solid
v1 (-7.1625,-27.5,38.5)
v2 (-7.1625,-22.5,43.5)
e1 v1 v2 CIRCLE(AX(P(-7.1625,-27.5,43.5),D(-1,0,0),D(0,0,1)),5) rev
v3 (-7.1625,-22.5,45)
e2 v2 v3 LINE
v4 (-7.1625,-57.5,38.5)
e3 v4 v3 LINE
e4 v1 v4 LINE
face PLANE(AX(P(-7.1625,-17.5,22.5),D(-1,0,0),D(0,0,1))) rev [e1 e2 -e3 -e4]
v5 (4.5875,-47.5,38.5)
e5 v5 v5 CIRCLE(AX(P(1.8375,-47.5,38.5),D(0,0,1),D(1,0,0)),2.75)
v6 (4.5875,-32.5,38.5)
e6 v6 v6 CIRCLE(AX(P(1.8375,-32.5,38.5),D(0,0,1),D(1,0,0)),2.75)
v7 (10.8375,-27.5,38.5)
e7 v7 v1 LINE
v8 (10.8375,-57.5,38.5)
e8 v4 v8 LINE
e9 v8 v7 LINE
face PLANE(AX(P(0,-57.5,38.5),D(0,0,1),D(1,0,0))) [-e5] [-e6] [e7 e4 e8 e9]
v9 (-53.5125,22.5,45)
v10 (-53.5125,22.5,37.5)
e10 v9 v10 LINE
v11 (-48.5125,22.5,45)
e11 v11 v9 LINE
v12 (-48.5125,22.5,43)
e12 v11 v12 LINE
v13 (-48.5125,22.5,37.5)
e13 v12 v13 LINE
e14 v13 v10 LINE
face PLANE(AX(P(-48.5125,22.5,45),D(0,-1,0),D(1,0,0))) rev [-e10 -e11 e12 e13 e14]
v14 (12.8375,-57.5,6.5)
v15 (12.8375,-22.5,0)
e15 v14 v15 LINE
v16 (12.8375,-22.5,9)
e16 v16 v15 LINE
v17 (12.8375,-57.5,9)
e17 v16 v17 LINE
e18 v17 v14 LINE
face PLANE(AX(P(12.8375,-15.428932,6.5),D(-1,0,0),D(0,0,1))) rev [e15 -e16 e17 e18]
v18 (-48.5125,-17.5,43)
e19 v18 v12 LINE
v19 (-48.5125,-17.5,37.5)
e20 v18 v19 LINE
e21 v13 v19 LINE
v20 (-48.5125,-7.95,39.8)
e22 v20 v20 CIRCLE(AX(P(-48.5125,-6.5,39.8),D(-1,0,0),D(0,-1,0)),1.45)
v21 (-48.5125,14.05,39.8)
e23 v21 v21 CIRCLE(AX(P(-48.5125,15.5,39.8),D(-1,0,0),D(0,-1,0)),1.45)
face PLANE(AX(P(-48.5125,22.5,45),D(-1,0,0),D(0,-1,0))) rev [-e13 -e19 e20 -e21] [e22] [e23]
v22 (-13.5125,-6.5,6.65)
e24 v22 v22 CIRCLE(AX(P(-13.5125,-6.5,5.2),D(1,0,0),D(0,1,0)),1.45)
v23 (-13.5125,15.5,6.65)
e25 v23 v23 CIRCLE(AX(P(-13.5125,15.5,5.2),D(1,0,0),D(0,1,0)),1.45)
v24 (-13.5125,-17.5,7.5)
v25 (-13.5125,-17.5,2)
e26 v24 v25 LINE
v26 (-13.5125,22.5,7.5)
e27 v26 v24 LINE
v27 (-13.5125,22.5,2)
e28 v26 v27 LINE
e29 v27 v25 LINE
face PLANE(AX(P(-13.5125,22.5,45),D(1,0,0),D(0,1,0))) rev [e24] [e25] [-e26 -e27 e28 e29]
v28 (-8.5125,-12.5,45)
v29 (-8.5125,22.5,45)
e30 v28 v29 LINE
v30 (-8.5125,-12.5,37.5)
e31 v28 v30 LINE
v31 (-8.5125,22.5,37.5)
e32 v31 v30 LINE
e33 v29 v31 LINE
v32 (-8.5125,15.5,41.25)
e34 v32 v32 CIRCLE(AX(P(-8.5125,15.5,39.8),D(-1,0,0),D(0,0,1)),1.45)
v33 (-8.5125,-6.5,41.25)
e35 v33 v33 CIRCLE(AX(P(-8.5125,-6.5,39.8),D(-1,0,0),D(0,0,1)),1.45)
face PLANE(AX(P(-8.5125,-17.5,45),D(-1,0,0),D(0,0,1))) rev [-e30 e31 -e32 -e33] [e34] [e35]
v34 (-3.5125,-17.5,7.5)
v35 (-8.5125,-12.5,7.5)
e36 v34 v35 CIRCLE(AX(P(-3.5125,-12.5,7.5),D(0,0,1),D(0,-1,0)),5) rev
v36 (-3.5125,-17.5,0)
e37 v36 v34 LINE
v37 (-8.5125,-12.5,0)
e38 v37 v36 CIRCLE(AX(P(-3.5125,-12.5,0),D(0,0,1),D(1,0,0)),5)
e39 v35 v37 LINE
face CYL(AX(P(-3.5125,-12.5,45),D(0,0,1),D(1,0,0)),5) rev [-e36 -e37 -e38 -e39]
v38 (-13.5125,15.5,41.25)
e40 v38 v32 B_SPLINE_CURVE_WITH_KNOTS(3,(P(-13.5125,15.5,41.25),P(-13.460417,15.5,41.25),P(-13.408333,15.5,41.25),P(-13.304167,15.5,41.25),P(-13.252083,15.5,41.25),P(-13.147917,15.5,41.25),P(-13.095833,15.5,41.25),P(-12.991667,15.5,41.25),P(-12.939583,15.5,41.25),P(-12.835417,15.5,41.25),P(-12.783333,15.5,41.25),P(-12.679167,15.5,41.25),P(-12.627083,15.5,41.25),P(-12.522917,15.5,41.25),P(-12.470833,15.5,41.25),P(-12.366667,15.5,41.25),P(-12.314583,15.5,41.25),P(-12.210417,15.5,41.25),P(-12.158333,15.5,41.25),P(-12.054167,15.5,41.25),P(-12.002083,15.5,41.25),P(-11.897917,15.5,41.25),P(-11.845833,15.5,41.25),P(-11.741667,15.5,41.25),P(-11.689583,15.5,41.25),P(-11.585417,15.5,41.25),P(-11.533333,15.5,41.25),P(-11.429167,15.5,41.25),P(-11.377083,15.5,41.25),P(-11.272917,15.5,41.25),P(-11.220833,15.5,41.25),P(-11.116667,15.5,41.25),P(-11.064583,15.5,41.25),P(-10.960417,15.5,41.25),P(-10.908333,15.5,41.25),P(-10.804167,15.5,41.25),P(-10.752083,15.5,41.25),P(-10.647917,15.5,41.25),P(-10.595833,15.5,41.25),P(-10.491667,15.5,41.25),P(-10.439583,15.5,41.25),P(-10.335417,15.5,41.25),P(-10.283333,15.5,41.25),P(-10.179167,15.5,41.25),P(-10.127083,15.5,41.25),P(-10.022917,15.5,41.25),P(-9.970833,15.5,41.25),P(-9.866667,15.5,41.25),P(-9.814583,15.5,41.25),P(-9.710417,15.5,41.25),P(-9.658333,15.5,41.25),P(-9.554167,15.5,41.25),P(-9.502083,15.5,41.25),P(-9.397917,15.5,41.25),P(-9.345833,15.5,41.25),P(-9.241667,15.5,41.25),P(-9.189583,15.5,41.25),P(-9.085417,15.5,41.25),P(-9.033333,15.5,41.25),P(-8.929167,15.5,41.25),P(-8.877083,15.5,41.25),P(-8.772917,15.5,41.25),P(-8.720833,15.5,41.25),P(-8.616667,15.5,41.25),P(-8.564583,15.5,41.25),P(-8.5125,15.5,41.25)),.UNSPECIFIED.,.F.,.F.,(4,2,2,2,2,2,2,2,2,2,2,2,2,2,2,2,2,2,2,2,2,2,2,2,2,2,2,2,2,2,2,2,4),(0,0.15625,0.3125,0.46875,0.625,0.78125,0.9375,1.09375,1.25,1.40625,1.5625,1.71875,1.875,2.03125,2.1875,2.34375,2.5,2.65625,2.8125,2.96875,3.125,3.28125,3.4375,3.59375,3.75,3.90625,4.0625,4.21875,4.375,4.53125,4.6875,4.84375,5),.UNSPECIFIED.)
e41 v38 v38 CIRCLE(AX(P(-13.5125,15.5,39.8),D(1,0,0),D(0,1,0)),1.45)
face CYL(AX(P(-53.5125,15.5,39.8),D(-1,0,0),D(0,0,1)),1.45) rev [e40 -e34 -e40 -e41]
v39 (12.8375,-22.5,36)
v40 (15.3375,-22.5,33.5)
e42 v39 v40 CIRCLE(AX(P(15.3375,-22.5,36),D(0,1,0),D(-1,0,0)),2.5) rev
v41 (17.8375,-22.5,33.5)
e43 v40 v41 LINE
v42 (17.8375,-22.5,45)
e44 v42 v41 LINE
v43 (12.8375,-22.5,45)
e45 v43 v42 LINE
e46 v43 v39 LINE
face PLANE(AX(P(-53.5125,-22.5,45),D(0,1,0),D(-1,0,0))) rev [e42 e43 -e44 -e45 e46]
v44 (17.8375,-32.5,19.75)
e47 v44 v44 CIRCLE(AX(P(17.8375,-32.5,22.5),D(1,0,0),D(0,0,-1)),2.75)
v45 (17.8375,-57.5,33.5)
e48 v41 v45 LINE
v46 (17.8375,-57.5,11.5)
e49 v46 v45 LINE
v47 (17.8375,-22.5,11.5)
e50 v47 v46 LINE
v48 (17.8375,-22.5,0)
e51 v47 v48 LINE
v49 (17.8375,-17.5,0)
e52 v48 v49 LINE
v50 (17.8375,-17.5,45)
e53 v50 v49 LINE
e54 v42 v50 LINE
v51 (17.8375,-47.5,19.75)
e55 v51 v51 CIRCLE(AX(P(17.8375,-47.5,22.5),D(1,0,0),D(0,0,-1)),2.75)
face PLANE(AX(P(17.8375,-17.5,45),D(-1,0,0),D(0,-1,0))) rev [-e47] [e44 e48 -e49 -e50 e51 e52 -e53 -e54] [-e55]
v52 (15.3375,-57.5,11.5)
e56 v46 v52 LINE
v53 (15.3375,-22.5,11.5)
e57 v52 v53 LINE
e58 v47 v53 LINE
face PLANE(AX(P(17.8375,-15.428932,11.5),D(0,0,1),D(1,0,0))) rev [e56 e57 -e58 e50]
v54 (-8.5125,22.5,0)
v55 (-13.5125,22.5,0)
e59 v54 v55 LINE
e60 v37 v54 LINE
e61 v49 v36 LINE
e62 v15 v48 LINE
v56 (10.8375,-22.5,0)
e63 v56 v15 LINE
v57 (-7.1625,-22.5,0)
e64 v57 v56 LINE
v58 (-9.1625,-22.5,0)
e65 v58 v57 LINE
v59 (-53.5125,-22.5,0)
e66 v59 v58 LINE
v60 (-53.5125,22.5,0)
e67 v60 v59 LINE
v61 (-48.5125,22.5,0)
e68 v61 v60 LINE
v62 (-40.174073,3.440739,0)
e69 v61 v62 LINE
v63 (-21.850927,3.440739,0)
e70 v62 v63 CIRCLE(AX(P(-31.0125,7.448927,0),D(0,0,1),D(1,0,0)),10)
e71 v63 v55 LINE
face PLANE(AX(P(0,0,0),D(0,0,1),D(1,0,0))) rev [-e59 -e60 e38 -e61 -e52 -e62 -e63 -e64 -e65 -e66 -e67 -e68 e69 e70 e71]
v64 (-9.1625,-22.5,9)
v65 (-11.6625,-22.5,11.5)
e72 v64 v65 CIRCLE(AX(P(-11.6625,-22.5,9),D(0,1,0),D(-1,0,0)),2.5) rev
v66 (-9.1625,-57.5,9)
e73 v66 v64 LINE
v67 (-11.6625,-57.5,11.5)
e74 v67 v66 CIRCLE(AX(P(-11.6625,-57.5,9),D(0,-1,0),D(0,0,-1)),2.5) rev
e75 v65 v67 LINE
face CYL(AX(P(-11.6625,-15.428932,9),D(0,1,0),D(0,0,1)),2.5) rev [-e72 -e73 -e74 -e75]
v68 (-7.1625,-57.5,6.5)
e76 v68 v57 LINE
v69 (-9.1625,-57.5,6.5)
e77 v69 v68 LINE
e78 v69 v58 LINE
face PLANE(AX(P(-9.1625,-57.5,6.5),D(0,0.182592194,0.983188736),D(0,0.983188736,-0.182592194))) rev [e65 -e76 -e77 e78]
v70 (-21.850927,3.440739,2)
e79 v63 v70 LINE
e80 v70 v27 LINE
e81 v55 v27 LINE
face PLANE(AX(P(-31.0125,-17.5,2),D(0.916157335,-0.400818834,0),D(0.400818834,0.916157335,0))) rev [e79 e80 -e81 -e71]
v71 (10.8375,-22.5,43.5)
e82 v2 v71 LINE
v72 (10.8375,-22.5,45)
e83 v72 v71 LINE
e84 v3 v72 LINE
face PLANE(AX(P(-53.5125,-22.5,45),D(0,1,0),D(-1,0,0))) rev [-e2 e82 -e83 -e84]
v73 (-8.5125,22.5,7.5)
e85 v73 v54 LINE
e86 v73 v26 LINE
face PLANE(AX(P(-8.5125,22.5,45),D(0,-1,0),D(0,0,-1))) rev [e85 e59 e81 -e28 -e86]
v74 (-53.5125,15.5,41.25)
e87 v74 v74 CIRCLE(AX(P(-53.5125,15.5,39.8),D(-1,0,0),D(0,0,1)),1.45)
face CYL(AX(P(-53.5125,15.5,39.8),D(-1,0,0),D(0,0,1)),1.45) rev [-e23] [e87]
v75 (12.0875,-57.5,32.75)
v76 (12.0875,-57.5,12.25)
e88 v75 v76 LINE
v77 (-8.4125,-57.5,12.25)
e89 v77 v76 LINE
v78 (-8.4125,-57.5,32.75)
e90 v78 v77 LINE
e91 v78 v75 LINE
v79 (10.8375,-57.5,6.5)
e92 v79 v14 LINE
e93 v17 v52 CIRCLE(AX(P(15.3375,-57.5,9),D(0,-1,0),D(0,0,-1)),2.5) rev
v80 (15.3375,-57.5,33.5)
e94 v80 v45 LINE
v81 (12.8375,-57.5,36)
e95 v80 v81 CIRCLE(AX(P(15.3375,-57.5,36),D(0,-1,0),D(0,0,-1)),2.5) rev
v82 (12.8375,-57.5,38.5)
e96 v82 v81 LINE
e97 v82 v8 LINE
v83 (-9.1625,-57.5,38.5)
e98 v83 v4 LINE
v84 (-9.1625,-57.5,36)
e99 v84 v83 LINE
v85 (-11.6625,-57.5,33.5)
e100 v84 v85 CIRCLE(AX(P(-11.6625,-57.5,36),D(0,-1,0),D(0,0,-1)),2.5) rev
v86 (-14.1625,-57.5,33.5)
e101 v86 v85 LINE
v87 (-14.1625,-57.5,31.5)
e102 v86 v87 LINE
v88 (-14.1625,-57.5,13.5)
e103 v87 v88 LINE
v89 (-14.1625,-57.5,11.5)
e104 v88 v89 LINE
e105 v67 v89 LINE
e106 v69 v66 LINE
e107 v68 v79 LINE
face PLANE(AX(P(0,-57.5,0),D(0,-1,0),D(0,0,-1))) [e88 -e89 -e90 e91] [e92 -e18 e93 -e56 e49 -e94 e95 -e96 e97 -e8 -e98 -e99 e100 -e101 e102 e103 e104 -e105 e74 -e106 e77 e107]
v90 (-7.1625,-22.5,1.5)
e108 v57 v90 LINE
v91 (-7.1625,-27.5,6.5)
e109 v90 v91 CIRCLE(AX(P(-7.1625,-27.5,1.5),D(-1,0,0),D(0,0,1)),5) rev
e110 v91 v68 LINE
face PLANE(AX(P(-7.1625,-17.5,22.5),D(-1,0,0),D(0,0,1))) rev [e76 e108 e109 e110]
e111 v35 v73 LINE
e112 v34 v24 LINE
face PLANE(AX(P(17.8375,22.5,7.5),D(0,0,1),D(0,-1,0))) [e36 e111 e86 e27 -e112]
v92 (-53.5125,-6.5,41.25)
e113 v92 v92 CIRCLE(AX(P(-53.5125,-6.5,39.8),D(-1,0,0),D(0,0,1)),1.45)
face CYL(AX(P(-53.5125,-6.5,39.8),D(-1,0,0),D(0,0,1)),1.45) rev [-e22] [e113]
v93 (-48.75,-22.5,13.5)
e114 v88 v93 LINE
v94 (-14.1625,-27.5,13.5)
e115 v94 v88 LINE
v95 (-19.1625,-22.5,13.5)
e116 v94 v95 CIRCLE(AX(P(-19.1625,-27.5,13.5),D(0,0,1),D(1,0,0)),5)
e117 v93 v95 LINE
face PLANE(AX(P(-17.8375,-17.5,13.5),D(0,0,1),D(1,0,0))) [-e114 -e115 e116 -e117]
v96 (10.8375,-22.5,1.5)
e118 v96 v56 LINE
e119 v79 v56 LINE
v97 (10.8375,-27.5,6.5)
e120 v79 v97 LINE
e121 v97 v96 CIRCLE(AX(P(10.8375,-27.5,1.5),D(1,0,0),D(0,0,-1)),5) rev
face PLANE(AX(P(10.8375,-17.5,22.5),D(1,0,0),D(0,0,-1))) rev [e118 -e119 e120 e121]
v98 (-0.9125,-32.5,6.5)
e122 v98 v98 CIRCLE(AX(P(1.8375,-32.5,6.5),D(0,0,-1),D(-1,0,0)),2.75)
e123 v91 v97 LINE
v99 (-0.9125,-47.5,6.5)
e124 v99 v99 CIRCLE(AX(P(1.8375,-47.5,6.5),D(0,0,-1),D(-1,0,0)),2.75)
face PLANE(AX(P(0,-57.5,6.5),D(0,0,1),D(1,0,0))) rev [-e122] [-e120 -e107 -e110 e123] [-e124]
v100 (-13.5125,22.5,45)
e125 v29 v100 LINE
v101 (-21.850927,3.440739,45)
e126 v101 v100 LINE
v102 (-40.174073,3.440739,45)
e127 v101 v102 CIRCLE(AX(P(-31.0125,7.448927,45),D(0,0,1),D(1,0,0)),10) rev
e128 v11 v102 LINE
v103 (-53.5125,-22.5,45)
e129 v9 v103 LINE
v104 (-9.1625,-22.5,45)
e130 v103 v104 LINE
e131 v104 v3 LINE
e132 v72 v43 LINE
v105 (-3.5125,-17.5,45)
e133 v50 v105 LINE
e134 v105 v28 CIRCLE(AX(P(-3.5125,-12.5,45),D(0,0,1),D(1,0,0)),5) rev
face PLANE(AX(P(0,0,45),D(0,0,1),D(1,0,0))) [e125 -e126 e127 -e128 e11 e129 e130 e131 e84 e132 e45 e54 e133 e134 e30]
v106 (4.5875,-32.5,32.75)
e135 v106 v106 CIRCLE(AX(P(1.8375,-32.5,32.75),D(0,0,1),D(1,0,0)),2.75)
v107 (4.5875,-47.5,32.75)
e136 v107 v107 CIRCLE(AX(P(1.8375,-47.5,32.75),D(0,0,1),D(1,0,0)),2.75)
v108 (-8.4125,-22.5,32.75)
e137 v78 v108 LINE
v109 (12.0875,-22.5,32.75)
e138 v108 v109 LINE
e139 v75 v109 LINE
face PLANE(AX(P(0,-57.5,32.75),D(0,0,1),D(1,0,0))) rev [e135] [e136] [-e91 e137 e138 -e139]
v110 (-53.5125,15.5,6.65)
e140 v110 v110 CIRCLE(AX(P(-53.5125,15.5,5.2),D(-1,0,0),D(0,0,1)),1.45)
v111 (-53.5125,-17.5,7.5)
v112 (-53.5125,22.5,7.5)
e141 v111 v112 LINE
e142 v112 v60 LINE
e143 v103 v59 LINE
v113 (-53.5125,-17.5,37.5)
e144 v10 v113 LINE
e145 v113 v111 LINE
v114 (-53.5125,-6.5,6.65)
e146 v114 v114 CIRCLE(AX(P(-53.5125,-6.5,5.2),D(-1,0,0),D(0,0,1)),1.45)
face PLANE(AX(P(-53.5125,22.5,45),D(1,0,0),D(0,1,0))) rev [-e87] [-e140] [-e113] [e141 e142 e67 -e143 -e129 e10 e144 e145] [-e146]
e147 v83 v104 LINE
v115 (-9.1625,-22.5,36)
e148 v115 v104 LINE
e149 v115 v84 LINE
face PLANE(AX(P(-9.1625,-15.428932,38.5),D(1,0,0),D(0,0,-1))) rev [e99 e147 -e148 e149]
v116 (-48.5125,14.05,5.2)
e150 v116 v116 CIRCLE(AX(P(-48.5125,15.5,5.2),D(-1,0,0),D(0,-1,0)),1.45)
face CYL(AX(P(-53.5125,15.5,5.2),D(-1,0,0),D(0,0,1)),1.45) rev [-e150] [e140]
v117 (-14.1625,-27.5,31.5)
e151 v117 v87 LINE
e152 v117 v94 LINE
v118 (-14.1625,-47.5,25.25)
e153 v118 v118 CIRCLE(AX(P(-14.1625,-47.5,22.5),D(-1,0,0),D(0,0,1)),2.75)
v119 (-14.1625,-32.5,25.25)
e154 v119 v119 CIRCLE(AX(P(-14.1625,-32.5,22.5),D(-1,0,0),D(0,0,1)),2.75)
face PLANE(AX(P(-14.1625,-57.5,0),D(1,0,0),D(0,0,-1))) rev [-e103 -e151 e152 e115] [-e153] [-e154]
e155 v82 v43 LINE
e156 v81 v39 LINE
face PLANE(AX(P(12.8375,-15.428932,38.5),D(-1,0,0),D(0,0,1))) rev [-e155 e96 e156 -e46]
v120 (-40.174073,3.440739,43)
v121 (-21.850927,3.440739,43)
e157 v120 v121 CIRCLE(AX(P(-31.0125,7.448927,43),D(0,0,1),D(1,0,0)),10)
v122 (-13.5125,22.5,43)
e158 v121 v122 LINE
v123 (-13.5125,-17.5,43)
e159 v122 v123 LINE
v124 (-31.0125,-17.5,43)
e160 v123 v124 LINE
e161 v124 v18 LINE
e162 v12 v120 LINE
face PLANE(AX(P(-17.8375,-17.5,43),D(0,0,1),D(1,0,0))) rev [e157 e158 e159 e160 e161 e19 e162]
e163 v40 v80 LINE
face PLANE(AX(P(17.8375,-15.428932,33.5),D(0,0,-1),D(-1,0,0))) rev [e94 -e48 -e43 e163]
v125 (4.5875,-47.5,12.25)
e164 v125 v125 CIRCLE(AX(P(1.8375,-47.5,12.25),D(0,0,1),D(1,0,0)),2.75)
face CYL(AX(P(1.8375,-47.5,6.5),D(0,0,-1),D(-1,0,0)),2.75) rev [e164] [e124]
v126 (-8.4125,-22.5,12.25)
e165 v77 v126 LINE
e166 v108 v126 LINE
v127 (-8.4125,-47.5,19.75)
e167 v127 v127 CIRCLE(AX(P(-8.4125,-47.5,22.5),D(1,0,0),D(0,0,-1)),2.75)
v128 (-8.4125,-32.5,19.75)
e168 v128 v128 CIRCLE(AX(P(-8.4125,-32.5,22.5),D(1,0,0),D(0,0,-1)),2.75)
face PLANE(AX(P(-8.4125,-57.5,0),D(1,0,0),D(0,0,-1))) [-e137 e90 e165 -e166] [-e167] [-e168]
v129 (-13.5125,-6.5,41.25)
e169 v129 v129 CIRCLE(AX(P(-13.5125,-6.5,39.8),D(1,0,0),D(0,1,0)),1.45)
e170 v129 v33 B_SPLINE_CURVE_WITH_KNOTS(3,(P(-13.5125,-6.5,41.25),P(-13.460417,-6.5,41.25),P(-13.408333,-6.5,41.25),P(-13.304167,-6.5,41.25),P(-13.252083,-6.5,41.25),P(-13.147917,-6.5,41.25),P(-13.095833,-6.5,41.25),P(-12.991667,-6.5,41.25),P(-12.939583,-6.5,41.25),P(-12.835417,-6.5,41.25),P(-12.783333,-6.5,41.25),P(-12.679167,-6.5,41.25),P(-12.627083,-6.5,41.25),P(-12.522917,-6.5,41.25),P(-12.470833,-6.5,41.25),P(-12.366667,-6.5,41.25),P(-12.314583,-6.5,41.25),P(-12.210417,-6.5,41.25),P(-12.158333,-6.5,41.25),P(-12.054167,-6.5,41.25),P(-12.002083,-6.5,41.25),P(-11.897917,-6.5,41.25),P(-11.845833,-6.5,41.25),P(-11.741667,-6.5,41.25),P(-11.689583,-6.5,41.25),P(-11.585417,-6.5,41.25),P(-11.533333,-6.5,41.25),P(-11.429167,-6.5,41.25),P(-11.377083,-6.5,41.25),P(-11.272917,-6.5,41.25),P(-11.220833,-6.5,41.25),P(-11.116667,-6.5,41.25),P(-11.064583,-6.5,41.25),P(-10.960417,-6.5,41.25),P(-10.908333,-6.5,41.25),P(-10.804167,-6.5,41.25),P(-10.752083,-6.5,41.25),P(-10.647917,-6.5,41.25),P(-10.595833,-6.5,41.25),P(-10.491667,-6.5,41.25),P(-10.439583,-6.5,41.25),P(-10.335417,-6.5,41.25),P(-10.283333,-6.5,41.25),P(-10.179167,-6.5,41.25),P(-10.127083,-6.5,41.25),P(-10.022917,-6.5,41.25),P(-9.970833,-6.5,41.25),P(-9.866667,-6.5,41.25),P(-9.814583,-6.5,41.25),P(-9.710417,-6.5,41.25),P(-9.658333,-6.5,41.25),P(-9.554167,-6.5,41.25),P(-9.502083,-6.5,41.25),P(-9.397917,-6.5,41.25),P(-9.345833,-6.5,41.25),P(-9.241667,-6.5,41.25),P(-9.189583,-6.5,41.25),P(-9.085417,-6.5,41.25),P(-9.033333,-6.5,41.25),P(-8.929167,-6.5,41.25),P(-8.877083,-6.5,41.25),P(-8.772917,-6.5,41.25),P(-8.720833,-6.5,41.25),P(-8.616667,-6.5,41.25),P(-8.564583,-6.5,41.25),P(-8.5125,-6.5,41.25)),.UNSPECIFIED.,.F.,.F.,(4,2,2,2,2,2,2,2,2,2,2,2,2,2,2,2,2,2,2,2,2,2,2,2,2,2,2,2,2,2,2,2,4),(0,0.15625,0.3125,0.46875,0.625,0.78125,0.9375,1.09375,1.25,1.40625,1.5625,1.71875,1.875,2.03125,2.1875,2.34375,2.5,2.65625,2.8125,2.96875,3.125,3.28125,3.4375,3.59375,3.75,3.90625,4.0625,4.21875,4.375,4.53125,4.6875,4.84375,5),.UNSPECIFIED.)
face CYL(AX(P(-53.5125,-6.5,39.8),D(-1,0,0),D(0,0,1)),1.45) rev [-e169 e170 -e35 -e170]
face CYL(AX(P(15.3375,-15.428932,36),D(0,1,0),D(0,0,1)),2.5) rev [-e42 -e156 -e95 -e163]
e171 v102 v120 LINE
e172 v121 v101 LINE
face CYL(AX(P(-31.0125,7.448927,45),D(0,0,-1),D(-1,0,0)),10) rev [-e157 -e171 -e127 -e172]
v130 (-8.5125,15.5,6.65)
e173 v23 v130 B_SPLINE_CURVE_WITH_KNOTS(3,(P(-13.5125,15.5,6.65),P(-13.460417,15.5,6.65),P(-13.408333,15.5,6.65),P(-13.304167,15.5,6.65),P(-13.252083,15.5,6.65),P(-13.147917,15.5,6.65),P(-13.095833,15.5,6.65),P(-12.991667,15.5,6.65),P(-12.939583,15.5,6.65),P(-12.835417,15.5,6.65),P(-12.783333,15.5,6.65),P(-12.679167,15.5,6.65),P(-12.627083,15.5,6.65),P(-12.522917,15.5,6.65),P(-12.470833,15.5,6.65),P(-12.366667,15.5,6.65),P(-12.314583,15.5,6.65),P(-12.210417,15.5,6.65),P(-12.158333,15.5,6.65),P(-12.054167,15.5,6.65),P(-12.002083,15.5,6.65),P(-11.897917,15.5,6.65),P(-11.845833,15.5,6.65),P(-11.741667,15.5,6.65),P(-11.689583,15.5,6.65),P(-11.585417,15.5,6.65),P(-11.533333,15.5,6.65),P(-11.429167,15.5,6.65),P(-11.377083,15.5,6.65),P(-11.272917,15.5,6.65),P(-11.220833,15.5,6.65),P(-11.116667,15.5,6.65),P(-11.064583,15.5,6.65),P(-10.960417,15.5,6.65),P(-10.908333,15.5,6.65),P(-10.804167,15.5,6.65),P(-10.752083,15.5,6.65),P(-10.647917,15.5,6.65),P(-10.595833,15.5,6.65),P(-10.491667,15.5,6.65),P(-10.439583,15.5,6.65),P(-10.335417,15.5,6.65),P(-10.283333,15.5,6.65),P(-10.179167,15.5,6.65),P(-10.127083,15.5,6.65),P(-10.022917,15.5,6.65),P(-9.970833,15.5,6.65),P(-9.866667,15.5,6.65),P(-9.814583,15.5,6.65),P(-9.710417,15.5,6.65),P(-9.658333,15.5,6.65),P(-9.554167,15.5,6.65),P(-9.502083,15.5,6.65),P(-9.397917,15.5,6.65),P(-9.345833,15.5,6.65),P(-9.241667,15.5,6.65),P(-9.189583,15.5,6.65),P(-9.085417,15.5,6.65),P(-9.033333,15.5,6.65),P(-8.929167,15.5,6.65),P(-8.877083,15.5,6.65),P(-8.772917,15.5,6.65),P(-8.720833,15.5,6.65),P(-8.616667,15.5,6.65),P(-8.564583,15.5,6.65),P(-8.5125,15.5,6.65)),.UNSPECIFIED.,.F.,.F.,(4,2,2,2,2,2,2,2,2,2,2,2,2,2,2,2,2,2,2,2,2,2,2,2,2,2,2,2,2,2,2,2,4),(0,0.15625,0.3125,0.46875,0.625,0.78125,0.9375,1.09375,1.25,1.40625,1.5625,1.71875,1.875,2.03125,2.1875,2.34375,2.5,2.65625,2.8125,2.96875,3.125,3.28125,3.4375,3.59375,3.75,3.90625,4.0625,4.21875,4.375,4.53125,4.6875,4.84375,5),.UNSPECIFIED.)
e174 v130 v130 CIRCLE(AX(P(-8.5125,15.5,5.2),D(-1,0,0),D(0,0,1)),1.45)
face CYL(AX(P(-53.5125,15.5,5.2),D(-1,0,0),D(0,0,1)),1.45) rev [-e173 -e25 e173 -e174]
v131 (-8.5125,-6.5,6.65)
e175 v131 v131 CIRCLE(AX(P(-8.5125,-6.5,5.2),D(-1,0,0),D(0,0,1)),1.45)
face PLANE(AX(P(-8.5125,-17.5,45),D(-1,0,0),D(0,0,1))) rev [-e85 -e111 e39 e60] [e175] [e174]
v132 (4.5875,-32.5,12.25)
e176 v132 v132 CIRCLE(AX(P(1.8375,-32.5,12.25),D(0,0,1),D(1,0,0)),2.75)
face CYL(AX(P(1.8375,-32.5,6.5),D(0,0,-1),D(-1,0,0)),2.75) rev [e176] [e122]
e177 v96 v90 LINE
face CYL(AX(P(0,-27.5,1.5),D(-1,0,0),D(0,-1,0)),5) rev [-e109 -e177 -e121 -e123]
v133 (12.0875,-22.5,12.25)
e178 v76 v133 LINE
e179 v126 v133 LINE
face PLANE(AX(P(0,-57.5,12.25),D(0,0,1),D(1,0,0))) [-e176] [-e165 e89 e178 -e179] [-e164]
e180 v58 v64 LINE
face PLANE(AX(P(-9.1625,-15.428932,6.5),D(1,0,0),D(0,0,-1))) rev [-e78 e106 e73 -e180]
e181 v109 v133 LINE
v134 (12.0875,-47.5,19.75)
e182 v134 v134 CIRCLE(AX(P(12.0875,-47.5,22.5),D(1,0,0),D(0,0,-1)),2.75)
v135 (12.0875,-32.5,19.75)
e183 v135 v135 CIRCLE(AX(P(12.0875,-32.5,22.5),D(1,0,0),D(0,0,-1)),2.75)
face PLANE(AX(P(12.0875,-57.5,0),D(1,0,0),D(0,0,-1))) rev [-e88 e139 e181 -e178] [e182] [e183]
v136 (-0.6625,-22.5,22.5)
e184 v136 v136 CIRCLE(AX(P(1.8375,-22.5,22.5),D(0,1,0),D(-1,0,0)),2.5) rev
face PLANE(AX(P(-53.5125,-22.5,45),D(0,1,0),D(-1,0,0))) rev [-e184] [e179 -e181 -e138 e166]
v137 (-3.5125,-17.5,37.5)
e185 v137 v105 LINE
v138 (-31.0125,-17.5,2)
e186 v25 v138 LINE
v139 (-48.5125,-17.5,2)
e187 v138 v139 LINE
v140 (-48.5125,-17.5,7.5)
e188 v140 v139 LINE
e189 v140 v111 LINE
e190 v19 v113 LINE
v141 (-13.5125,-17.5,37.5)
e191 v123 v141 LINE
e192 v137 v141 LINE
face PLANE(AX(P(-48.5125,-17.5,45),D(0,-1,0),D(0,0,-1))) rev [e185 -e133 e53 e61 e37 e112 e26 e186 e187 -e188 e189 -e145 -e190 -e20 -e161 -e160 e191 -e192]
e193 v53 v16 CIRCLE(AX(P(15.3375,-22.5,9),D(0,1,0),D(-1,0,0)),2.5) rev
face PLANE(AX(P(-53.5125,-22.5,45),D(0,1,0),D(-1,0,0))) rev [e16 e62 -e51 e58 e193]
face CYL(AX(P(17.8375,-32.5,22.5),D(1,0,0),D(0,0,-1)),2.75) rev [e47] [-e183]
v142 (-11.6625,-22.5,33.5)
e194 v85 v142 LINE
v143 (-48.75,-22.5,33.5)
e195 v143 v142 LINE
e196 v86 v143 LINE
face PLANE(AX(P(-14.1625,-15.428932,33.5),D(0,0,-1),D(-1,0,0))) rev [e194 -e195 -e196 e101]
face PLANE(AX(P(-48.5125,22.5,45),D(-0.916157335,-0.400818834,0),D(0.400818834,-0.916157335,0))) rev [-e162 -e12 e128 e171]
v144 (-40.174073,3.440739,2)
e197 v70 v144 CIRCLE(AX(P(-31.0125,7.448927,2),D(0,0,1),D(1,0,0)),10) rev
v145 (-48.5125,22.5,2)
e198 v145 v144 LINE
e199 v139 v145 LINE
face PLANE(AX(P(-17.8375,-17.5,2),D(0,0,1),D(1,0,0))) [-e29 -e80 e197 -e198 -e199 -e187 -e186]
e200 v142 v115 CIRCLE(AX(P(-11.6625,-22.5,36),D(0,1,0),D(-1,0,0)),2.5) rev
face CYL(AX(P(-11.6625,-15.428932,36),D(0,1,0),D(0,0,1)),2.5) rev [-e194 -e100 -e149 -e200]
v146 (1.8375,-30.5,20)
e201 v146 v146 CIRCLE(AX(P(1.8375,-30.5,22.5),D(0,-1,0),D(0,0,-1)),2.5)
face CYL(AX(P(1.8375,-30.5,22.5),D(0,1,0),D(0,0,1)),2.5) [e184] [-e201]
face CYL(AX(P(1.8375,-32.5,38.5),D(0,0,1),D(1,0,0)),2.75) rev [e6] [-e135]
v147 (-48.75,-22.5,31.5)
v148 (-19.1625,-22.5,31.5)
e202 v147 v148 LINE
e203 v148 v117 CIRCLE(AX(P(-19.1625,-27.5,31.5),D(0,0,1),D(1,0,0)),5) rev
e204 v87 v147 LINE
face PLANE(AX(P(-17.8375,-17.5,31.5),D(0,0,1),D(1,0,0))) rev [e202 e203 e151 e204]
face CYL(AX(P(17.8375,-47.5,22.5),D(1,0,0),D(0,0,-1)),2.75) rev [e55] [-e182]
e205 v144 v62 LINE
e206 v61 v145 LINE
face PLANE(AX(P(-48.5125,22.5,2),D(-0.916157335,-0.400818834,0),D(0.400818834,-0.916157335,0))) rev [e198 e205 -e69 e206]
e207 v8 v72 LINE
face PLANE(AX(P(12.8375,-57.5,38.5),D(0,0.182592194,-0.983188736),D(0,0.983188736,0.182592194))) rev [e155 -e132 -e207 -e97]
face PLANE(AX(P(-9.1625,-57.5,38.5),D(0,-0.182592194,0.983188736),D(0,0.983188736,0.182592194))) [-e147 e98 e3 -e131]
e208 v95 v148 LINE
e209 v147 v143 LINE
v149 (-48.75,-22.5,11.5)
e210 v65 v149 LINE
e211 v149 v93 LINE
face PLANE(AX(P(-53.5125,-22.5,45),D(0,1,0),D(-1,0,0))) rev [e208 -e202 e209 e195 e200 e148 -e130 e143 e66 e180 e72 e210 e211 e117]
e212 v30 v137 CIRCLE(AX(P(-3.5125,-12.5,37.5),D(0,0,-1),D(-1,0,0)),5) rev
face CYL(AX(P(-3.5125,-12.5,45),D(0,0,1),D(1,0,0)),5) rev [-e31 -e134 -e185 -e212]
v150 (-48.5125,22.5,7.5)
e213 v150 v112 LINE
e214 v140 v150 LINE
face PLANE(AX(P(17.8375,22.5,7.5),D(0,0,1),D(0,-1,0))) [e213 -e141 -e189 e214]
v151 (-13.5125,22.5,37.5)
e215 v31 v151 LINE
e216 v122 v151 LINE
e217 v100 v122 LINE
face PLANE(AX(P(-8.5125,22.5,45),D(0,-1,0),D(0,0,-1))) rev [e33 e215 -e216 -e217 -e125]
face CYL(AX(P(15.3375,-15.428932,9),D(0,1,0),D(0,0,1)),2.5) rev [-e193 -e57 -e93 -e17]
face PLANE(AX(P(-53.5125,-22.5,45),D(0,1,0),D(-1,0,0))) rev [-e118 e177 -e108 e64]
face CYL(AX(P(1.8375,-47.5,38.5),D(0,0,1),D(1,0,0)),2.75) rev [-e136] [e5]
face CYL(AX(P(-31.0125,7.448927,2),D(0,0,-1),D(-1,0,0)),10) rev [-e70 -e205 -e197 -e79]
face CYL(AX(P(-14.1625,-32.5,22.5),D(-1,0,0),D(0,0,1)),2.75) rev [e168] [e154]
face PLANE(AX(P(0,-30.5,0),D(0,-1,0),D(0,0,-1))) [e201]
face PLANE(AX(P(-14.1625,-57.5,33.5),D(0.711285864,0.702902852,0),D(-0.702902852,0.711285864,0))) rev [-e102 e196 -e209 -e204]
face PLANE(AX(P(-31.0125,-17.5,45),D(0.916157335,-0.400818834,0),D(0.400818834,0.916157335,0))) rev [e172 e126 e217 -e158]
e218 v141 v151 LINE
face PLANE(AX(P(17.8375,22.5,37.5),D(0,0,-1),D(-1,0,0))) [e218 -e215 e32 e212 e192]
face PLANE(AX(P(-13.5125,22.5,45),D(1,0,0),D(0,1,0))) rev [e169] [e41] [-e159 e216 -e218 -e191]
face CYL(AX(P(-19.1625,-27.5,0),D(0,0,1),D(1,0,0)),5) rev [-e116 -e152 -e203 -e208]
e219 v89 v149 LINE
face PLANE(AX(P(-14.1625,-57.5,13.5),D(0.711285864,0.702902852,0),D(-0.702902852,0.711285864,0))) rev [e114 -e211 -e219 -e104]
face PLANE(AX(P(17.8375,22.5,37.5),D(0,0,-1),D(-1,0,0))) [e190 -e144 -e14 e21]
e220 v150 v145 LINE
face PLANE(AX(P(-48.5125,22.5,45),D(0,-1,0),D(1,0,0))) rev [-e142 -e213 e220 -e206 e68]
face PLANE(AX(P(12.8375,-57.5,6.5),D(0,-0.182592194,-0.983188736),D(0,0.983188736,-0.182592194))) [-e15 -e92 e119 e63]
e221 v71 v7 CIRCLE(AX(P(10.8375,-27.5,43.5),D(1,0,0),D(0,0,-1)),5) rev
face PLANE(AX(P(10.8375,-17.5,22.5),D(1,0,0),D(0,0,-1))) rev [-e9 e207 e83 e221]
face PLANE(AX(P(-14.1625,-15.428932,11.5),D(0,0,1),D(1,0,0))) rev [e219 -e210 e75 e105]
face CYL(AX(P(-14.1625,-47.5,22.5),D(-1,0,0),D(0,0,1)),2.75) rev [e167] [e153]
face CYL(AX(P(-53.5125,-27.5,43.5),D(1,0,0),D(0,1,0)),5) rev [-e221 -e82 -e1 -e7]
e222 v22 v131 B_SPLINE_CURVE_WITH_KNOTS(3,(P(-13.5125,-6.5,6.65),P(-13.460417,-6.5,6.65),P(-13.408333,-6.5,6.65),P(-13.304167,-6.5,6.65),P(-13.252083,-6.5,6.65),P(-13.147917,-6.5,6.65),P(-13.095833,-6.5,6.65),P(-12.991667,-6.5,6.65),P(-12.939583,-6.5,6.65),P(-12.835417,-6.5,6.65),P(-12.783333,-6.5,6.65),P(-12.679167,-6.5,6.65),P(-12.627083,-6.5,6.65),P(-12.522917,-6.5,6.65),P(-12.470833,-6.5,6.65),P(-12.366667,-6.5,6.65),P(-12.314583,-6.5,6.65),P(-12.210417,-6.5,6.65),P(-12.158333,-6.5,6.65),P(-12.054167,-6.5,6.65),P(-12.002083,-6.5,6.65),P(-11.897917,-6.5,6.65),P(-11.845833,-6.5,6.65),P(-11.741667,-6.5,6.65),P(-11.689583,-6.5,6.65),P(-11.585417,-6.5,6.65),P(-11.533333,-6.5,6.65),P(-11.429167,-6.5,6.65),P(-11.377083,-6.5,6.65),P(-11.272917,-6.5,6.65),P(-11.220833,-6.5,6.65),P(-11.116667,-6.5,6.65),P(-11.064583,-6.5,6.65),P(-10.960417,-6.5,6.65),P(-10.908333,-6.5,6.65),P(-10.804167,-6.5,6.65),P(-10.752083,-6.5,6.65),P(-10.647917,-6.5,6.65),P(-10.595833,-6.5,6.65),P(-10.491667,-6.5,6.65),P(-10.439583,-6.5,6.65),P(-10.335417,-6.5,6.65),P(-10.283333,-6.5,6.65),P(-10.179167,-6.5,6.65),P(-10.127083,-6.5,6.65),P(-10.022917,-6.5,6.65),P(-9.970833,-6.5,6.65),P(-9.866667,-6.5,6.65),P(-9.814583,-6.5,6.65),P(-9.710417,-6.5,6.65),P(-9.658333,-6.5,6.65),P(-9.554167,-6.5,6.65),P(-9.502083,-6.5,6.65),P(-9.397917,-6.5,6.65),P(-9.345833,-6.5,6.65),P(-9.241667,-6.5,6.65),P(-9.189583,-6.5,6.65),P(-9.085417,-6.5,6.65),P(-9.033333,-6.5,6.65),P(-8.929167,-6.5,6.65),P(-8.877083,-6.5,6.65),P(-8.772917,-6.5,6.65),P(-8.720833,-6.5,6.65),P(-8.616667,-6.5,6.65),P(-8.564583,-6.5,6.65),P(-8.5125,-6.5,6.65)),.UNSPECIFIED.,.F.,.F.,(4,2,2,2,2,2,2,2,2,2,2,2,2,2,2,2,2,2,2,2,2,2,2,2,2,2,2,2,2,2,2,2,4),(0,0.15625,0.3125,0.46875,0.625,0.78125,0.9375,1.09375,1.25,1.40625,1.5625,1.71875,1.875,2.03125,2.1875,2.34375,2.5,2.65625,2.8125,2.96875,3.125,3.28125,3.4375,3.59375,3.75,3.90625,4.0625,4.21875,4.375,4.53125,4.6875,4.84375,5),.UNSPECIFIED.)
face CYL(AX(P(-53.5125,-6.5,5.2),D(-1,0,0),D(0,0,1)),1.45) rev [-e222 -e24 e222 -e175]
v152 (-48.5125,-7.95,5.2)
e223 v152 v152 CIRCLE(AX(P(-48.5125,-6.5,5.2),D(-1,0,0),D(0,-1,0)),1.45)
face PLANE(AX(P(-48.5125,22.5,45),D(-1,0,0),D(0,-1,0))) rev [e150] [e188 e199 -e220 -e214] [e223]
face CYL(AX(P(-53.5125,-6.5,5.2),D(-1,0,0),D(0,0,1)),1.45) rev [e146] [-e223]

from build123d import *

# Parameters (mm, degrees)
BOSS_EXTRUDE1_DEPTH           = 45
SKETCH3_W                     = 30
SKETCH3_H                     = 40
CUT_EXTRUDE1_DEPTH            = 88.304481557
SKETCH4_W                     = 32
SKETCH4_H                     = 32
SKETCH4_W_2                   = 20.5
SKETCH4_H_2                   = 20.5
BOSS_EXTRUDE2_DEPTH           = 35
SKETCH6_W                     = 5
SKETCH6_H                     = 5
CUT_EXTRUDE4_DEPTH            = 35
RIB1_REACH                    = 87.394
SKETCH9_WALL_W                = 221.994100462
SKETCH9_WALL_H                = 2
LPATTERN1_COUNT               = 2
LPATTERN1_PITCH               = 20
RIB6_REACH                    = 100.659
SKETCH14_WALL_W               = 234.916193708
SKETCH14_WALL_H               = 2
RIB7_START                    = -2
RIB7_DEPTH                    = 2
FILLET2_R                     = 5
FILLET3_R                     = 5
RIB10_REACH                   = 92.525
SKETCH17_WALL_W               = 226.71130823
SKETCH17_WALL_H               = 2
RIB11_REACH                   = 92.525
SKETCH18_WALL_W               = 226.71130823
SKETCH18_WALL_H               = 2
FILLET4_R                     = 10
LPATTERN2_COUNT               = 2
LPATTERN2_PITCH               = 43
FILLET4_OF_LPATTERN2_R        = 10
M5_CLEARANCE_HOLE2_AT_2_COUNT = 2
M5_CLEARANCE_HOLE2_AT_2_PITCH = 15
M2_5_CLEARANCE_HOLE1_D        = 2.9
FILLET5_R                     = 2.5
SKETCH4_4_R                   = 2.5
BOSS_EXTRUDE4_DEPTH           = 8
CIRPATTERN1_COUNT             = 4


# Read off the part's stored shape, not the designer's step: Rib7
with BuildPart() as part:
    # Sketch2 → Boss-Extrude1 (new body)
    with BuildSketch(Plane.XY):
        Polygon((-53.5125, -22.5), (17.8375, -22.5), (17.8375, -17.5), (-8.5125, -17.5), (-8.5125, 22.5), (-13.5125, 22.5), (-13.5125, -17.5), (-48.5125, -17.5), (-48.5125, 22.5), (-53.5125, 22.5), align=None)
    extrude(amount=BOSS_EXTRUDE1_DEPTH)

    # Sketch3 → Cut-Extrude1 (cut, through all)
    with BuildSketch(Plane(origin=(-53.5125, 0, 0), x_dir=(0, 0, -1), z_dir=(1, 0, 0))):
        with Locations((-22.5, 2.5)):
            Rectangle(SKETCH3_W, SKETCH3_H)
    extrude(amount=CUT_EXTRUDE1_DEPTH, mode=Mode.SUBTRACT)

    # Sketch4 → Boss-Extrude2 (add)
    with BuildSketch(Plane.XZ.offset(22.5)):
        with Locations((1.8375, 22.5)):
            Rectangle(SKETCH4_W, SKETCH4_H)
        with Locations((1.8375, 22.5)):
            Rectangle(SKETCH4_W_2, SKETCH4_H_2, mode=Mode.SUBTRACT)
    extrude(amount=BOSS_EXTRUDE2_DEPTH)

    # Sketch6 → Cut-Extrude4 (cut)
    with BuildSketch(Plane(origin=(0, -57.5, 0), x_dir=(-1, 0, 0), z_dir=(0, -1, 0))):
        with Locations((11.6625, -36)):
            Rectangle(SKETCH6_W, SKETCH6_H)
        with Locations((-15.3375, -36)):
            Rectangle(SKETCH6_W, SKETCH6_H)
        with Locations((-15.3375, -9)):
            Rectangle(SKETCH6_W, SKETCH6_H)
        with Locations((11.6625, -9)):
            Rectangle(SKETCH6_W, SKETCH6_H)
    extrude(amount=-CUT_EXTRUDE4_DEPTH, mode=Mode.SUBTRACT)

    # Sketch9 wall → Rib1 (add, up to next)
    with BuildSketch(Plane(origin=(-31.45625, -40, 33.5), x_dir=(-0.70290285213, 0.7112858641, 0), z_dir=(-0.7112858641, -0.70290285213, 0)), mode=Mode.PRIVATE) as rib1_sk1:
        with Locations((0, 1)):
            Rectangle(SKETCH9_WALL_W, SKETCH9_WALL_H)
    rib1_tool1 = extrude(rib1_sk1.sketch, amount=-RIB1_REACH, mode=Mode.PRIVATE) - part.part
    rib1 = rib1_tool1.solids().sort_by_distance((-31.45625, -40, 33.5))[0]
    add(rib1)

    # LPattern1: Rib1 ×2
    with Locations(*[(0, 0, -i * LPATTERN1_PITCH) for i in range(1, LPATTERN1_COUNT)]):
        add(rib1)

    # Sketch14 wall → Rib6 (add, up to next)
    with BuildSketch(Plane(origin=(12.8375, -40, 3.25), x_dir=(0, 0.983188736076, -0.182592193843), z_dir=(0, 0.182592193843, 0.983188736076)), mode=Mode.PRIVATE) as rib6_sk1:
        with Locations((0, 1)):
            Rectangle(SKETCH14_WALL_W, SKETCH14_WALL_H)
    rib6_tool1 = extrude(rib6_sk1.sketch, amount=RIB6_REACH, mode=Mode.PRIVATE) - part.part
    rib6 = rib6_tool1.solids().sort_by_distance((12.8375, -40, 3.25))[0]
    add(rib6)

    # Rib7 outline → Rib7 (add)
    with BuildSketch(Plane.ZY.offset(9.1625).offset(RIB7_START)):
        Polygon((0, -22.5), (6.5, -57.5), (6.5, -22.5), align=None)
    rib7 = extrude(amount=RIB7_DEPTH)

    # Fillet2
    fillet2_edges = [part.edges().sort_by_distance(p)[0] for p in [
        (1.8375, -22.5, 38.5),
        (-14.1625, -22.5, 22.5),
        (1.8375, -22.5, 6.5),
    ]]
    fillet(fillet2_edges, radius=FILLET2_R)

    # Fillet3
    fillet3_edges = [part.edges().sort_by_distance(p)[0] for p in [
        (-8.5125, -17.5, 41.25),
        (-8.5125, -17.5, 3.75),
    ]]
    fillet(fillet3_edges, radius=FILLET3_R)

    # Sketch17 wall → Rib10 (add, up to next)
    with BuildSketch(Plane(origin=(-39.7625, 2.5, 45), x_dir=(0.40081883402, -0.916157334902, 0), z_dir=(0.916157334902, 0.40081883402, 0)), mode=Mode.PRIVATE) as rib10_sk1:
        with Locations((0, 1)):
            Rectangle(SKETCH17_WALL_W, SKETCH17_WALL_H)
    rib10_tool1 = extrude(rib10_sk1.sketch, amount=-RIB10_REACH, mode=Mode.PRIVATE) - part.part
    rib10 = rib10_tool1.solids().sort_by_distance((-39.7625, 2.5, 45))[0]
    add(rib10)

    # Sketch18 wall → Rib11 (add, up to next)
    with BuildSketch(Plane(origin=(-22.2625, 2.5, 45), x_dir=(0.40081883402, 0.916157334902, 0), z_dir=(-0.916157334902, 0.40081883402, 0)), mode=Mode.PRIVATE) as rib11_sk1:
        with Locations((0, 1)):
            Rectangle(SKETCH18_WALL_W, SKETCH18_WALL_H)
    rib11_tool1 = extrude(rib11_sk1.sketch, amount=-RIB11_REACH, mode=Mode.PRIVATE) - part.part
    rib11 = rib11_tool1.solids().sort_by_distance((-22.2625, 2.5, 45))[0]
    add(rib11)

    # Fillet4
    # the kernel refuses this fillet: 10 mm, written as the material it adds along each edge
    with BuildSketch(Plane(origin=(-31.0125, -17.5, 45), x_dir=(-0.4008188340200226, 0.9161573349020513, 0), z_dir=(0, 0, -1))) as fillet4_piece_1:
        with BuildLine():
            CenterArc((FILLET4_R * 2.28571428571, FILLET4_R), FILLET4_R, 137.258755461, 132.741244539)
            Line((FILLET4_R * 1.55128805621, FILLET4_R * 1.67868852459), (0, 0))
            Line((0, 0), (FILLET4_R * 2.28571428571, 0))
        make_face()
    extrude(amount=2)

    # LPattern2: Rib10, Rib11 ×2
    with Locations(*[(0, 0, -i * LPATTERN2_PITCH) for i in range(1, LPATTERN2_COUNT)]):
        add(rib10)
        add(rib11)

    # Fillet4 of LPattern2
    # the kernel refuses this fillet: 10 mm, written as the material it adds along each edge
    with BuildSketch(Plane(origin=(-31.0125, -17.5, 59.142857143), x_dir=(-0.4008188340200225, 0.9161573349020515, 0), z_dir=(0, 0, -1))) as fillet4_of_lpattern2_piece_1_section:
        with BuildLine():
            CenterArc((FILLET4_OF_LPATTERN2_R * 2.28571428571, FILLET4_OF_LPATTERN2_R), FILLET4_OF_LPATTERN2_R, 137.258755461, 132.741244539)
            Line((FILLET4_OF_LPATTERN2_R * 1.5512880562, FILLET4_OF_LPATTERN2_R * 1.67868852459), (0, 0))
            Line((0, 0), (FILLET4_OF_LPATTERN2_R * 2.28571428571, 0))
        make_face()
    fillet4_of_lpattern2_piece_1 = extrude(amount=59.142857143, mode=Mode.PRIVATE)
    fillet4_of_lpattern2_piece_1 = split(fillet4_of_lpattern2_piece_1, bisect_by=Plane(origin=(-31.0125, -6.732617491, 43), z_dir=(0, 0, 1)), keep=Keep.TOP, mode=Mode.PRIVATE)
    fillet4_of_lpattern2_piece_1 = split(fillet4_of_lpattern2_piece_1, bisect_by=Plane(origin=(-31.0125, -6.732617491, 45), z_dir=(0, 0, -1)), keep=Keep.TOP, mode=Mode.PRIVATE)
    add(fillet4_of_lpattern2_piece_1)
    with BuildSketch(Plane(origin=(-31.0125, -17.5, 2), x_dir=(-0.4008188340200226, 0.9161573349020513, 0), z_dir=(0, 0, -1))) as fillet4_of_lpattern2_piece_2:
        with BuildLine():
            CenterArc((FILLET4_OF_LPATTERN2_R * 2.28571428571, FILLET4_OF_LPATTERN2_R), FILLET4_OF_LPATTERN2_R, 137.258755461, 132.741244539)
            Line((FILLET4_OF_LPATTERN2_R * 1.55128805621, FILLET4_OF_LPATTERN2_R * 1.67868852459), (0, 0))
            Line((0, 0), (FILLET4_OF_LPATTERN2_R * 2.28571428571, 0))
        make_face()
    extrude(amount=2)

    # Sketch22 → M5 Clearance Hole2 (revolve, cut)
    with BuildSketch(Plane(origin=(1.8375, -32.5, 38.5), x_dir=(0, -1, 0), z_dir=(1, 0, 0))):
        Polygon((0, 0), (0, 7.652366702), (2.75, 6), (2.75, 0), align=None)
    m5_clearance_hole2 = revolve(axis=Axis((1.8375, -32.5, 44.85), (0, 0, -1)), mode=Mode.SUBTRACT)

    # M5 Clearance Hole2 at 2: M5 Clearance Hole2 ×2
    with Locations(*[(0, -i * M5_CLEARANCE_HOLE2_AT_2_PITCH, 0) for i in range(1, M5_CLEARANCE_HOLE2_AT_2_COUNT)]):
        add(m5_clearance_hole2, mode=Mode.SUBTRACT)

    # M2.5 Clearance Hole1 (through all)
    with Locations(Plane.ZY.offset(53.5125)):
        with Locations((5.2, 15.5), (39.8, 15.5), (39.8, -6.5), (5.2, -6.5)):
            Hole(M2_5_CLEARANCE_HOLE1_D / 2)

    # Fillet5
    fillet5_edges = [part.edges().sort_by_distance(p)[0] for p in [
        (-9.1625, -40, 11.5),
        (12.8375, -40, 11.5),
        (12.8375, -40, 33.5),
        (-9.1625, -40, 33.5),
    ]]
    fillet(fillet5_edges, radius=FILLET5_R)

    # Sketch4<4> → Boss-Extrude4 (add)
    with BuildSketch(Plane.XZ.offset(22.5)):
        with Locations(Location((1.8375, 22.5, 0), (0, 0, 180))):
            Circle(SKETCH4_4_R)
    extrude(amount=BOSS_EXTRUDE4_DEPTH)

    # CirPattern1: M5 Clearance Hole2 ×4 about axis
    cirpattern1_axis = Axis((1.8375, -30.5, 22.5), (0, -1, 0))
    for i in range(1, CIRPATTERN1_COUNT):
        add(m5_clearance_hole2.rotate(cirpattern1_axis, i * 360 / CIRPATTERN1_COUNT), mode=Mode.SUBTRACT)

    # CirPattern1 copy 1 sketch → CirPattern1 copy 1 (revolve, cut)
    with BuildSketch(Plane(origin=(-14.1625, -47.5, 22.5), x_dir=(0, -1, 0), z_dir=(0, 0, 1))):
        Polygon((0, 0), (0, 7.652366702), (2.75, 6), (2.75, 0), align=None)
    revolve(axis=Axis((-20.5125, -47.5, 22.5), (1, 0, 0)), mode=Mode.SUBTRACT)

    # CirPattern1 copy 2 sketch → CirPattern1 copy 2 (revolve, cut)
    with BuildSketch(Plane(origin=(1.8375, -47.5, 6.5), x_dir=(0, -1, 0), z_dir=(-1, 0, 0))):
        Polygon((0, 0), (0, 7.652366702), (2.75, 6), (2.75, 0), align=None)
    revolve(axis=Axis((1.8375, -47.5, 0.15), (0, 0, 1)), mode=Mode.SUBTRACT)

    # CirPattern1 copy 3 sketch → CirPattern1 copy 3 (revolve, cut)
    with BuildSketch(Plane(origin=(17.8375, -47.5, 22.5), x_dir=(0, -1, 0), z_dir=(0, 0, -1))):
        Polygon((0, 0), (0, 7.652366702), (2.75, 6), (2.75, 0), align=None)
    revolve(axis=Axis((24.1875, -47.5, 22.5), (-1, 0, 0)), mode=Mode.SUBTRACT)

    # Mirror1: Rib6, Rib7 across plane
    add(rib6.mirror(Plane.XY.offset(22.5)))
    add(rib7.mirror(Plane.XY.offset(22.5)))


solid = part.part
